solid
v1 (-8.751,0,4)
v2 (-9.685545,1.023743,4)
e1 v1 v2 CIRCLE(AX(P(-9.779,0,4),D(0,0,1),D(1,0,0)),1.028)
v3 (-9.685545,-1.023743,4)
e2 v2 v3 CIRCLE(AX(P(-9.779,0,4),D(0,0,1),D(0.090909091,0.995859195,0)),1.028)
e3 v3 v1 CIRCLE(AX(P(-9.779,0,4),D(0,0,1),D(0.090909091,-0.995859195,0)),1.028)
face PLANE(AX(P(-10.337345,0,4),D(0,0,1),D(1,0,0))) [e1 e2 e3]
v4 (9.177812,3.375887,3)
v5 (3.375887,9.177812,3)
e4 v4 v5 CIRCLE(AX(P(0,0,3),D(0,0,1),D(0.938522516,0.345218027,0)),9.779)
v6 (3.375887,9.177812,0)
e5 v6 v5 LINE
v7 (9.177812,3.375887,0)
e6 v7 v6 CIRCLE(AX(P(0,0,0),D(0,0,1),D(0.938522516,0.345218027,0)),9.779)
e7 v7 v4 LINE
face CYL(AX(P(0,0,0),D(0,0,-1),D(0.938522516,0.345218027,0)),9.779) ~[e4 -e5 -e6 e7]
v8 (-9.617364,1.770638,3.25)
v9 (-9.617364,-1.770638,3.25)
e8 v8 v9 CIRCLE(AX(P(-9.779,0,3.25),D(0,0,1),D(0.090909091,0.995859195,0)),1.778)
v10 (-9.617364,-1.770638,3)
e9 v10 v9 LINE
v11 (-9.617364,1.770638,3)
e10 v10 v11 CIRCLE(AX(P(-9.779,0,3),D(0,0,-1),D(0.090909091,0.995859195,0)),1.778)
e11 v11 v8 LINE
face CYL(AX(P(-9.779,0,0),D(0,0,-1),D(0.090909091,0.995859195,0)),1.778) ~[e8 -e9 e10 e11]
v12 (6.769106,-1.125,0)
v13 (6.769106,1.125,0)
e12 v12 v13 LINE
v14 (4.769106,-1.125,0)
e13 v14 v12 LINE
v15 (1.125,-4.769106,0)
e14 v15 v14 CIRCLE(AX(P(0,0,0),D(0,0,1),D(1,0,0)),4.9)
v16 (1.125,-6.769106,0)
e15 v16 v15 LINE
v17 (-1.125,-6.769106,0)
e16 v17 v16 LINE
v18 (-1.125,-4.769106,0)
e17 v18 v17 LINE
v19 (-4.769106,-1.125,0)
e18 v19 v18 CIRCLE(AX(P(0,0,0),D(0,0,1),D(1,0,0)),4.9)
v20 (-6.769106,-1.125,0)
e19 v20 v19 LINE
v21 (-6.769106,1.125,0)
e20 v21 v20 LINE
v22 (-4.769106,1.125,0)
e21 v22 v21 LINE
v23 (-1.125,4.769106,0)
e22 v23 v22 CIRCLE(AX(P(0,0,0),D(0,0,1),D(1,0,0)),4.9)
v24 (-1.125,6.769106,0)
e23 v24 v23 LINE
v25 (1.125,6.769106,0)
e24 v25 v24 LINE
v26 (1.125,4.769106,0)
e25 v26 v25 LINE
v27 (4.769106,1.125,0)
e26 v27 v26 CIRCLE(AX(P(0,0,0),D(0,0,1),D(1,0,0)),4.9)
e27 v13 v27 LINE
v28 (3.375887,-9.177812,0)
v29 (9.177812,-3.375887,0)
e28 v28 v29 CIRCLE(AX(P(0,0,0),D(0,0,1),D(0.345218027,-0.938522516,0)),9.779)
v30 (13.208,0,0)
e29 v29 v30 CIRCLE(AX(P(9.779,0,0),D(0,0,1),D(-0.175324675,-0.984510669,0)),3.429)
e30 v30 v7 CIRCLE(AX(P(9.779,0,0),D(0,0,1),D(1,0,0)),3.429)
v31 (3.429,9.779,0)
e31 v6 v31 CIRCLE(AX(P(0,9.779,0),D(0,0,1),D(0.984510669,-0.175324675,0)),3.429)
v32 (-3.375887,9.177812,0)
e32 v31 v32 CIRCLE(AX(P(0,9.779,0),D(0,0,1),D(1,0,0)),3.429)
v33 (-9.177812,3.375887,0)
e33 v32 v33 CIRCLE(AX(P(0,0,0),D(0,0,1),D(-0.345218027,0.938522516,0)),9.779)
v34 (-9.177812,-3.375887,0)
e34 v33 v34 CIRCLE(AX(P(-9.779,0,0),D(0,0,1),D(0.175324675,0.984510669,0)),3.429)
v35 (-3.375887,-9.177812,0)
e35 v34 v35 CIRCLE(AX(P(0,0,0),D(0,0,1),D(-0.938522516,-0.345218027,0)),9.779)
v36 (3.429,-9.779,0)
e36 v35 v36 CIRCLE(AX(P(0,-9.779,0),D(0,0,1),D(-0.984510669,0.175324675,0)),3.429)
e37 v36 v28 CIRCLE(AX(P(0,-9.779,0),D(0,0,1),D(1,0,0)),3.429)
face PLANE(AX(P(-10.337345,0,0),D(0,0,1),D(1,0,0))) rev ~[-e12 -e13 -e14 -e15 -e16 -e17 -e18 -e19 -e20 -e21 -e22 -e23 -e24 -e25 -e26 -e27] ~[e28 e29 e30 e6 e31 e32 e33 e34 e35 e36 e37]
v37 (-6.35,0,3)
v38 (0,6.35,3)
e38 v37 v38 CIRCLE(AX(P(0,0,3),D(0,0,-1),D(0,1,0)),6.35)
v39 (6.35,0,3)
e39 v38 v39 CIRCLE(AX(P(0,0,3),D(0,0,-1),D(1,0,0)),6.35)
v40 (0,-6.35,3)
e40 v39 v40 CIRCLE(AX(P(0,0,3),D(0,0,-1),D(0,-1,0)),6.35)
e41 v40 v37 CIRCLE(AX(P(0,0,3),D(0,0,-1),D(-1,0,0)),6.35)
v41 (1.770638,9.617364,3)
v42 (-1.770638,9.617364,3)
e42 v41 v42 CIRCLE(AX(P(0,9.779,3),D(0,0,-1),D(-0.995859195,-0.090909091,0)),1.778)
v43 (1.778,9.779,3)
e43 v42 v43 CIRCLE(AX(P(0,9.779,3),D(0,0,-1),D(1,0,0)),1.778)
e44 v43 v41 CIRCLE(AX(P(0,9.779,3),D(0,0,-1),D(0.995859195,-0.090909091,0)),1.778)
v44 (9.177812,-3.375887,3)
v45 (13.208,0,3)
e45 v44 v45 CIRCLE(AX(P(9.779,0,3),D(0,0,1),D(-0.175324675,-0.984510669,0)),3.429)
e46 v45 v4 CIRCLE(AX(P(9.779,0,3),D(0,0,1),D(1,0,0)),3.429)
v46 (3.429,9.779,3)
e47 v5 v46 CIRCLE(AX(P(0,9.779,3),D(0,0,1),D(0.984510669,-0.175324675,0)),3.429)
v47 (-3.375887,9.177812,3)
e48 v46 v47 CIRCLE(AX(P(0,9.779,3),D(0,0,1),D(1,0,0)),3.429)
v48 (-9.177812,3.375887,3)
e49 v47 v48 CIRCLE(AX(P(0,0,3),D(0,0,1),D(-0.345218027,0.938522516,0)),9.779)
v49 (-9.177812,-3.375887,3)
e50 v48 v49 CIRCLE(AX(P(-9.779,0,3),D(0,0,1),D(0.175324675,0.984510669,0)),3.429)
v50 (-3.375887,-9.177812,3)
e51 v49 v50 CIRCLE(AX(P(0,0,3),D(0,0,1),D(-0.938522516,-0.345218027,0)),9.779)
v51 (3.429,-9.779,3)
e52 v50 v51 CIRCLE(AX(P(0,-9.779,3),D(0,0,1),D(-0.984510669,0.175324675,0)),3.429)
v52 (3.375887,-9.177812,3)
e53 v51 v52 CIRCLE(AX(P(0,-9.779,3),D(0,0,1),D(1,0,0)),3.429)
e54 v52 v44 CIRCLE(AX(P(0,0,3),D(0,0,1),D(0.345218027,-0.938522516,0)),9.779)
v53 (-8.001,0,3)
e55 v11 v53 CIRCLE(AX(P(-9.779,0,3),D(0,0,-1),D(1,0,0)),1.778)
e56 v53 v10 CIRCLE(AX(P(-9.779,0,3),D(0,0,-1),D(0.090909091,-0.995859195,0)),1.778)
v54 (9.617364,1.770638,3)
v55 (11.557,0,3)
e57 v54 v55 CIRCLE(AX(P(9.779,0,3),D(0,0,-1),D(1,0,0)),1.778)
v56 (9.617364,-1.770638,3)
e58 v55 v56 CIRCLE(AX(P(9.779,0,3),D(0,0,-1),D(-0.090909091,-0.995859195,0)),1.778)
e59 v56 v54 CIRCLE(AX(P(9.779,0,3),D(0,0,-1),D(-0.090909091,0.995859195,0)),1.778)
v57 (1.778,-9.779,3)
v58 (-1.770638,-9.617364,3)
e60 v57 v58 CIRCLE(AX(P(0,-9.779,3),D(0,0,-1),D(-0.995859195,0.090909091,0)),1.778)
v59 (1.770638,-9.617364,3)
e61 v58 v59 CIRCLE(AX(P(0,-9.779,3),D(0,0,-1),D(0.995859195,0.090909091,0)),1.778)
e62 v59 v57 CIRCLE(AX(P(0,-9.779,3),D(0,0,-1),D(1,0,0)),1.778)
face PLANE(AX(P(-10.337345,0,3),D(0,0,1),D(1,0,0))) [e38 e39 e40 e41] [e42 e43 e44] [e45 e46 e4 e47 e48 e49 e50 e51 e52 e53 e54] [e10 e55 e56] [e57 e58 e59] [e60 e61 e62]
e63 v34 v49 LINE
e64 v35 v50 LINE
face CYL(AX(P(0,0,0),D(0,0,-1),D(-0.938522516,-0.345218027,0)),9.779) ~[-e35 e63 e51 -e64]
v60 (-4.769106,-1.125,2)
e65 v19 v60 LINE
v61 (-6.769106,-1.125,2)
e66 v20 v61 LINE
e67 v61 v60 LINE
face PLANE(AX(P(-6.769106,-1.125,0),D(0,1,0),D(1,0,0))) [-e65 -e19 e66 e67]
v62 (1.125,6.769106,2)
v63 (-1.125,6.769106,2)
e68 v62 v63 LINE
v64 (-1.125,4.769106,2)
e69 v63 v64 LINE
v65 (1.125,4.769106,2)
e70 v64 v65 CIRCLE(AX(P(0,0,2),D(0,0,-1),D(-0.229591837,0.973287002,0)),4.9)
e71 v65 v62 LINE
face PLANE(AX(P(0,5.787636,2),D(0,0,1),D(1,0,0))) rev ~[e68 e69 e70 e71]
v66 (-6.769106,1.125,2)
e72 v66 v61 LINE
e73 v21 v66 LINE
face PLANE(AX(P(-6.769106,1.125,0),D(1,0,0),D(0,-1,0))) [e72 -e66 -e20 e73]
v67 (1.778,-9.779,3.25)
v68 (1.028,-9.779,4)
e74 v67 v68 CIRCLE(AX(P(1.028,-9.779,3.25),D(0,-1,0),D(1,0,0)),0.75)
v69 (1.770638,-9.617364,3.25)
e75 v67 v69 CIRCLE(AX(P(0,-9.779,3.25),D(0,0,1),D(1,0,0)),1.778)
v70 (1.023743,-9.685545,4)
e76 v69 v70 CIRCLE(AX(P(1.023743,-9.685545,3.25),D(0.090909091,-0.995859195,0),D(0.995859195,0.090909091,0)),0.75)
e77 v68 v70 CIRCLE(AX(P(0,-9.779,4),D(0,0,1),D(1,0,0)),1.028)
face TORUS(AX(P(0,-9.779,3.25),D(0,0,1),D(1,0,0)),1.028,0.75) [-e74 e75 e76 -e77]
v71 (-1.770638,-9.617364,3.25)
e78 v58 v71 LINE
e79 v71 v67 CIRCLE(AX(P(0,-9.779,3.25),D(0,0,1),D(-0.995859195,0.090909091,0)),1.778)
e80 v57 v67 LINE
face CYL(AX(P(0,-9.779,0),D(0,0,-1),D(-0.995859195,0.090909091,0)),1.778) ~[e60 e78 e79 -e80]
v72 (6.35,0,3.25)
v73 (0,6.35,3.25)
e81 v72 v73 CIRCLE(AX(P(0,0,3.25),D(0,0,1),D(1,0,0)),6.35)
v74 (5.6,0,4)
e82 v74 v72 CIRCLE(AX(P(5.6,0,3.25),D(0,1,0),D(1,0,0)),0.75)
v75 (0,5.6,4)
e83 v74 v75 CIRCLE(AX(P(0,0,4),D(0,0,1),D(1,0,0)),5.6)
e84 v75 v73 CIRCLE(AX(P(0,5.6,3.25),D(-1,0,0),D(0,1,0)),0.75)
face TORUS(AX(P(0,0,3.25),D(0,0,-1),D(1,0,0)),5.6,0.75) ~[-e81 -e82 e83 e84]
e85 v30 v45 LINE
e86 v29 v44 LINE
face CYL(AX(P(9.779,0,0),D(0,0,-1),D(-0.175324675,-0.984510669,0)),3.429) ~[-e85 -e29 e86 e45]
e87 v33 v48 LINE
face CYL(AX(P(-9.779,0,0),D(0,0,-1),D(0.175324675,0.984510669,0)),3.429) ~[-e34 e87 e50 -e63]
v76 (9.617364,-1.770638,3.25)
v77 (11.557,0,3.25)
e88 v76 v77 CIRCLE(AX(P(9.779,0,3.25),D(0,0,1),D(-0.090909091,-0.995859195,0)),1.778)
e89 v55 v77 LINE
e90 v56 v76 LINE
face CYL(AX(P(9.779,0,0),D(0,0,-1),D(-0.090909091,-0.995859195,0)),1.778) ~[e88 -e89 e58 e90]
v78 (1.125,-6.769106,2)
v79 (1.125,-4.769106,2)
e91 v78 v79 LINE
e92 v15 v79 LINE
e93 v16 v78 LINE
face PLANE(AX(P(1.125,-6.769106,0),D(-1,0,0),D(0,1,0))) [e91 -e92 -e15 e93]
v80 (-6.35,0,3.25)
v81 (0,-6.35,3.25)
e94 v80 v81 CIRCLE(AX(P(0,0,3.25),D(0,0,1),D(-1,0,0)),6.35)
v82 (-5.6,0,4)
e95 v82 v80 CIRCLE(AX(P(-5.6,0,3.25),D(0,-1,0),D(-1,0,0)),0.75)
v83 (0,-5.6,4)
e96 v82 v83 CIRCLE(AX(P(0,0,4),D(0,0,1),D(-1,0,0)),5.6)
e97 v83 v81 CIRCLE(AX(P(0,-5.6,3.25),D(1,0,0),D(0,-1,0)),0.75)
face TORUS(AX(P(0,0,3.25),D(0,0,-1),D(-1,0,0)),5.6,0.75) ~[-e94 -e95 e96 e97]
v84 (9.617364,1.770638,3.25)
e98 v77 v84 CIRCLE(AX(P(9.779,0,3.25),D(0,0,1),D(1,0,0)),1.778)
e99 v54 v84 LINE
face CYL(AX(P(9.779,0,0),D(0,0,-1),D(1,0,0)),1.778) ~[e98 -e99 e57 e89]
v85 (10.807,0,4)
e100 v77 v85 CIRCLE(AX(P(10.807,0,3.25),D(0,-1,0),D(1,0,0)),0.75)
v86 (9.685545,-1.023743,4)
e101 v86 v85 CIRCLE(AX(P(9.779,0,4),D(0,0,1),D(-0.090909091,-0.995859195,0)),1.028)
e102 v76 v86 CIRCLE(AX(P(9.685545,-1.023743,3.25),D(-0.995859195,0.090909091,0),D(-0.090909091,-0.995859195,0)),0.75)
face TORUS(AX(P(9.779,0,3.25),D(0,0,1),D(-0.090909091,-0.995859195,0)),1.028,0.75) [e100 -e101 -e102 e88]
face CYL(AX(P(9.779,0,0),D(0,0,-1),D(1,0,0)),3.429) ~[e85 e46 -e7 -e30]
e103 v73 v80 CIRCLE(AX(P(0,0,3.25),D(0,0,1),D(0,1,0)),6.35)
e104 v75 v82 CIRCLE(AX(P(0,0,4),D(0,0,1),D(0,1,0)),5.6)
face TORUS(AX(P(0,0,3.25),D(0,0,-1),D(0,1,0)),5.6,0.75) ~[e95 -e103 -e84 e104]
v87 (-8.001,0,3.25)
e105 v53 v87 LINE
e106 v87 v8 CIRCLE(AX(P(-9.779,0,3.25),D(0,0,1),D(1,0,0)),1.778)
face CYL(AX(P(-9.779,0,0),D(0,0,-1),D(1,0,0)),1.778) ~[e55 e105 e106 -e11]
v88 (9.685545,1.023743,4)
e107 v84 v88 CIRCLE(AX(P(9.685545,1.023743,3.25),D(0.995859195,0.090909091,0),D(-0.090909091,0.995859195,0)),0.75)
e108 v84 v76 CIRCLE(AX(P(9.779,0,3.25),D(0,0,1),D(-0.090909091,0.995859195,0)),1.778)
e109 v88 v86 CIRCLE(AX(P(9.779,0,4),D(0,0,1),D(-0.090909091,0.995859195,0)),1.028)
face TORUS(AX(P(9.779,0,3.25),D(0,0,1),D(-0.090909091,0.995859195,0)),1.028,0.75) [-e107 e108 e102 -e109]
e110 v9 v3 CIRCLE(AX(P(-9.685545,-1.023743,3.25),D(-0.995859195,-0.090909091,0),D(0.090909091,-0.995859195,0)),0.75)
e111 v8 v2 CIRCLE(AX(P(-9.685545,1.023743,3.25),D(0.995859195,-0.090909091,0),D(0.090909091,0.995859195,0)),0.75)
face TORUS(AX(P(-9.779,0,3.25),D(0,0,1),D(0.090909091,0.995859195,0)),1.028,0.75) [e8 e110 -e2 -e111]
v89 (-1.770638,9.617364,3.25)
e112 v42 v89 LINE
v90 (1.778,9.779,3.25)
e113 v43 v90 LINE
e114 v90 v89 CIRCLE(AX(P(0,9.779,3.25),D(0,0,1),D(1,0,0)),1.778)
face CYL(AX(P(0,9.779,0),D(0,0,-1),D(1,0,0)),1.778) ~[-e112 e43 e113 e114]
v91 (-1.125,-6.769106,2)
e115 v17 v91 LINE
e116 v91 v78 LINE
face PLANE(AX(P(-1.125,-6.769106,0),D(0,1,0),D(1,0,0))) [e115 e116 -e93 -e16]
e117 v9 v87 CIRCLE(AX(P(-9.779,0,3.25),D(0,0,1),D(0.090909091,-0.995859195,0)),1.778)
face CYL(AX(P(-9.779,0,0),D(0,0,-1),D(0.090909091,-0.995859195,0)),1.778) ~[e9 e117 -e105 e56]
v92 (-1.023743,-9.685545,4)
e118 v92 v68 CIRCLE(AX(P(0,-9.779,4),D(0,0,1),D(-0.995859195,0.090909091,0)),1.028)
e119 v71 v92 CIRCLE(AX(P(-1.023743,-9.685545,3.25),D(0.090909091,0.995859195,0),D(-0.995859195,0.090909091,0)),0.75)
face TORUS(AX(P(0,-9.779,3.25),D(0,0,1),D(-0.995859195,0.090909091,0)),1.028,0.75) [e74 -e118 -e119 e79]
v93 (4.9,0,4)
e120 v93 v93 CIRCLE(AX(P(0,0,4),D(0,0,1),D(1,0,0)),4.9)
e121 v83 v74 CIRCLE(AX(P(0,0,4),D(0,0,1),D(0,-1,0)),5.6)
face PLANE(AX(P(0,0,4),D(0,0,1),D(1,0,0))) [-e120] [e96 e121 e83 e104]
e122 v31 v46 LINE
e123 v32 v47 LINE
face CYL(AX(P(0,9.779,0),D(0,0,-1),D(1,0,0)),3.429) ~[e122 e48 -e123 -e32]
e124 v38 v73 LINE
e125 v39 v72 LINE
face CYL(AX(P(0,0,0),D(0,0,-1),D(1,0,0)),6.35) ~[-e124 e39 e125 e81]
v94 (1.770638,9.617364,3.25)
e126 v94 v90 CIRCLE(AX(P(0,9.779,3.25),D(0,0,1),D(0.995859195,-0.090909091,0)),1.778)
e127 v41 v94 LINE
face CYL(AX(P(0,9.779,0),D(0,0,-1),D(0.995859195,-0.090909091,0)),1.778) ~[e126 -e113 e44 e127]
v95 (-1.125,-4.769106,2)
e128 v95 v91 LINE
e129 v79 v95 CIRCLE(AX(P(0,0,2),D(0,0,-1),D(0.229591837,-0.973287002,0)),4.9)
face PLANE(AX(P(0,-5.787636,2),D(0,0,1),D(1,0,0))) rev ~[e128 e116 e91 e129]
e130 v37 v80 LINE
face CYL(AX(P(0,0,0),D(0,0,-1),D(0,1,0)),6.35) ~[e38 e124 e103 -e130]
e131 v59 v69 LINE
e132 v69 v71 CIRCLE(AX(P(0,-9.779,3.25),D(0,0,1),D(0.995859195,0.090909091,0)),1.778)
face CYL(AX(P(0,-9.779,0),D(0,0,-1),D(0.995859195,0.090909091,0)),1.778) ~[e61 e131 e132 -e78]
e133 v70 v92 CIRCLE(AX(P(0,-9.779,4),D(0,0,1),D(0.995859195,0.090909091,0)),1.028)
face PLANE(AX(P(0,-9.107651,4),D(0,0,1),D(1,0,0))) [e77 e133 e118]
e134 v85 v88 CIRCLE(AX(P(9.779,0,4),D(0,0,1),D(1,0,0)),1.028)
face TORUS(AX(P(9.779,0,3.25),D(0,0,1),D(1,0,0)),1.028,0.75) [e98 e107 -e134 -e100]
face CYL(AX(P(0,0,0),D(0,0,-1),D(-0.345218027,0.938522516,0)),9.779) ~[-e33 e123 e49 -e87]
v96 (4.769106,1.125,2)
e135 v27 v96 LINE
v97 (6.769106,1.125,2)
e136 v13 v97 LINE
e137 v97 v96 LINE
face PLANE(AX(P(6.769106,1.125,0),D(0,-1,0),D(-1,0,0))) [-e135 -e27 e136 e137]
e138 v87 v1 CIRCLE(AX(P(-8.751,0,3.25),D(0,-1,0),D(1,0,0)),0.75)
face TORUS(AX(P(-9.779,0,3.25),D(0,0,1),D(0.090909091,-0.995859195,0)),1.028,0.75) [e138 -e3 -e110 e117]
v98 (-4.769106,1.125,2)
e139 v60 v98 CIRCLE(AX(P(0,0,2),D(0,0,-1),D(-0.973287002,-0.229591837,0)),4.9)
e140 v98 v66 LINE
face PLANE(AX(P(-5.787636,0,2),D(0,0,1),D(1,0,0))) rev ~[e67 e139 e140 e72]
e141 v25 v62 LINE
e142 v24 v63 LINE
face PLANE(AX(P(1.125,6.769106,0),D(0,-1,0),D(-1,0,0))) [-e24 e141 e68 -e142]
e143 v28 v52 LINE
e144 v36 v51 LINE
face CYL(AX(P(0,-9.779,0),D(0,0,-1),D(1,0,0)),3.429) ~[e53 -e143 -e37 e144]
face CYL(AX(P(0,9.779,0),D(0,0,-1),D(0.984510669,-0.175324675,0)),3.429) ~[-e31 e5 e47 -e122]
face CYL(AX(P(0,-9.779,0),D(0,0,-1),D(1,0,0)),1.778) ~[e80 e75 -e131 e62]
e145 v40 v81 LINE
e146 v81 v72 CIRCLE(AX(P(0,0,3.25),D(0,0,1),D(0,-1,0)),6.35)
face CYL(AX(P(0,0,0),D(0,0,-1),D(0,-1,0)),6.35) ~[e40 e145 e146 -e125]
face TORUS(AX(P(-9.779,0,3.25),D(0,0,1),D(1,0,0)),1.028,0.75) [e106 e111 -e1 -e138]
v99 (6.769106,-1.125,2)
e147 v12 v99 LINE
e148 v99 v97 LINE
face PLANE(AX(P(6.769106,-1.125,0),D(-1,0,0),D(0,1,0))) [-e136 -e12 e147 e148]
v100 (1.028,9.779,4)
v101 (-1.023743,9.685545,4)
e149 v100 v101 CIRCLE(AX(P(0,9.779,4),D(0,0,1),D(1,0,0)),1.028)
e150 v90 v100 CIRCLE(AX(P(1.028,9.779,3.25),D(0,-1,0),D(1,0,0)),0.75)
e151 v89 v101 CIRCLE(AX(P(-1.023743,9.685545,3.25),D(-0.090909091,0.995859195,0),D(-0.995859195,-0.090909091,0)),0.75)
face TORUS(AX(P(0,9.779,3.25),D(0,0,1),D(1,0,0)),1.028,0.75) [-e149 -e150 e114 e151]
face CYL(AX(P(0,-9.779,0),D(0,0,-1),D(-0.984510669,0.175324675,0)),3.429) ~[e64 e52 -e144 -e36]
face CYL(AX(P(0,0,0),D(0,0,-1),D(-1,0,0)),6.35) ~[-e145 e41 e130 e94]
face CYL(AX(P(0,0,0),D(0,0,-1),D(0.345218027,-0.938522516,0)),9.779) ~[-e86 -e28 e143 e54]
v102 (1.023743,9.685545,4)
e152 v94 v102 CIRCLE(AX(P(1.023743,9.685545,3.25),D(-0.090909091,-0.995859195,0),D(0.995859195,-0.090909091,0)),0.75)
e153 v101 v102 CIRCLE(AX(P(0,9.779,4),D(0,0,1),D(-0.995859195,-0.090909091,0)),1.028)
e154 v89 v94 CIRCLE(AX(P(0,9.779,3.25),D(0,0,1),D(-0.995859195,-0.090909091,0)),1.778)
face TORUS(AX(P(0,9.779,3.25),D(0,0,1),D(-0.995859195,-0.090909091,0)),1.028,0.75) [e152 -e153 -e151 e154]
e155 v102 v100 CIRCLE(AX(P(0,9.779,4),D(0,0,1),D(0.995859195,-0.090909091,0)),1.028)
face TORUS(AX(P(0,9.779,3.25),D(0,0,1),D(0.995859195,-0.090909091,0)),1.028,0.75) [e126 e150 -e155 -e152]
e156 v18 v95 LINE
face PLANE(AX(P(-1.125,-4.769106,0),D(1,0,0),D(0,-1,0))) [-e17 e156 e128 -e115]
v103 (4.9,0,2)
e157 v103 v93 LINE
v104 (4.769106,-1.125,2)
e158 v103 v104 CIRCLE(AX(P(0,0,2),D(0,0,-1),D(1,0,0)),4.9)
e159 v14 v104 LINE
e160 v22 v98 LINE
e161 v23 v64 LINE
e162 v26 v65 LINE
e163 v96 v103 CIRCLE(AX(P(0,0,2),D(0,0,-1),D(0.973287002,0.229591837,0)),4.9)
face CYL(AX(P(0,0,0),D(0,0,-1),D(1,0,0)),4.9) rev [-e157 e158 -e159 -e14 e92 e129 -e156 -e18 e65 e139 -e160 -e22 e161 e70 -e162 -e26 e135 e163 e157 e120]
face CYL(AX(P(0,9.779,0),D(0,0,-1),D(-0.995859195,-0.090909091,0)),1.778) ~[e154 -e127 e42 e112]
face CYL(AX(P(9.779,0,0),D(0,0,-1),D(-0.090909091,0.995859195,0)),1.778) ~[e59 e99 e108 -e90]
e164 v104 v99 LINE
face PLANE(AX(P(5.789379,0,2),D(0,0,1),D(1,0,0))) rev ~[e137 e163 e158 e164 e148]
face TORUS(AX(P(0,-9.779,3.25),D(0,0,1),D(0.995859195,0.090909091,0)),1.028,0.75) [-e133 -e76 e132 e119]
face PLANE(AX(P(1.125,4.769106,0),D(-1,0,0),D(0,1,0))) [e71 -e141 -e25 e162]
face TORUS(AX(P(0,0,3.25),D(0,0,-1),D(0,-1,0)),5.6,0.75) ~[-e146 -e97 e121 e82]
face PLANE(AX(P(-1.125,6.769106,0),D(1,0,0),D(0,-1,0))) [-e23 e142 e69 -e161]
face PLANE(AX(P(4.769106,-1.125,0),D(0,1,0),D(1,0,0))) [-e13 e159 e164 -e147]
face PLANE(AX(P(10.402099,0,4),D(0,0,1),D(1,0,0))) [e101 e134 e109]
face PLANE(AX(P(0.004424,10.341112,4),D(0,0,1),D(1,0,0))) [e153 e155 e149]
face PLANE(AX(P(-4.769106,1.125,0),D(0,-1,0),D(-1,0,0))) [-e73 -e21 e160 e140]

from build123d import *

# Parameters (mm, degrees)
F0_R     = 4.9
F1_DEPTH = 3
F2_DEPTH = 4
F4_DEPTH = 2
F5_R     = 0.75


with BuildPart() as f1:
    # F0 (on Top) → F1 (new body)
    with BuildSketch(Plane.XY):
        with BuildLine():
            ThreePointArc((-9.6173636364, -1.7706376495), (-9.779, 0), (-9.6173636364, 1.7706376495))
            ThreePointArc((-9.6173636364, 1.7706376495), (-11.557, 0), (-9.6173636364, -1.7706376495))
        make_face()
        with BuildLine():
            ThreePointArc((1.778, 9.779), (-0.080901975, 11.5551584587), (-1.7706376495, 9.6173636364))
            ThreePointArc((-1.7706376495, 9.6173636364), (0, 9.779), (1.7706376495, 9.6173636364))
            ThreePointArc((1.7706376495, 9.6173636364), (1.7761584587, 9.698098025), (1.778, 9.779))
        make_face()
        with BuildLine():
            ThreePointArc((-3.3758870855, -9.1778116883), (-2.201881727, -7.1503581719), (0, -6.35))
            ThreePointArc((0, -6.35), (-4.4901280605, -4.4901280605), (-6.35, 0))
            ThreePointArc((-6.35, 0), (-7.1503581719, -2.201881727), (-9.1778116883, -3.3758870855))
            ThreePointArc((-9.1778116883, -3.3758870855), (-6.9147972132, -6.9147972132), (-3.3758870855, -9.1778116883))
        make_face()
        with BuildLine():
            ThreePointArc((-8.001, 0), (-8.4658599742, 1.1987273555), (-9.6173636364, 1.7706376495))
            ThreePointArc((-9.6173636364, 1.7706376495), (-9.779, 0), (-9.6173636364, -1.7706376495))
            ThreePointArc((-9.6173636364, -1.7706376495), (-8.4658599742, -1.1987273555), (-8.001, 0))
        make_face()
        with BuildLine():
            ThreePointArc((3.3758870855, -9.1778116883), (2.201881727, -7.1503581719), (0, -6.35))
            ThreePointArc((0, -6.35), (-2.201881727, -7.1503581719), (-3.3758870855, -9.1778116883))
            ThreePointArc((-3.3758870855, -9.1778116883), (-2.5826305757, -9.4318004808), (-1.7706376495, -9.6173636364))
            ThreePointArc((-1.7706376495, -9.6173636364), (0, -8.001), (1.7706376495, -9.6173636364))
            ThreePointArc((1.7706376495, -9.6173636364), (2.5826305757, -9.4318004808), (3.3758870855, -9.1778116883))
        make_face()
        with BuildLine():
            ThreePointArc((9.1778116883, 3.3758870855), (7.1503581719, 2.201881727), (6.35, 0))
            ThreePointArc((6.35, 0), (7.1503581719, -2.201881727), (9.1778116883, -3.3758870855))
            ThreePointArc((9.1778116883, -3.3758870855), (9.4318004808, -2.5826305757), (9.6173636364, -1.7706376495))
            ThreePointArc((9.6173636364, -1.7706376495), (8.001, 0), (9.6173636364, 1.7706376495))
            ThreePointArc((9.6173636364, 1.7706376495), (9.4318004808, 2.5826305757), (9.1778116883, 3.3758870855))
        make_face()
        with BuildLine():
            ThreePointArc((-9.1778116883, -3.3758870855), (-7.1503581719, -2.201881727), (-6.35, 0))
            ThreePointArc((-6.35, 0), (-7.1503581719, 2.201881727), (-9.1778116883, 3.3758870855))
            ThreePointArc((-9.1778116883, 3.3758870855), (-9.4318004808, 2.5826305757), (-9.6173636364, 1.7706376495))
            ThreePointArc((-9.6173636364, 1.7706376495), (-8.4658599742, 1.1987273555), (-8.001, 0))
            ThreePointArc((-8.001, 0), (-8.4658599742, -1.1987273555), (-9.6173636364, -1.7706376495))
            ThreePointArc((-9.6173636364, -1.7706376495), (-9.4318004808, -2.5826305757), (-9.1778116883, -3.3758870855))
        make_face()
        with BuildLine():
            ThreePointArc((11.557, 0), (10.9777273555, 1.3131400258), (9.6173636364, 1.7706376495))
            ThreePointArc((9.6173636364, 1.7706376495), (9.7385070724, 0.889), (9.779, 0))
            ThreePointArc((9.779, 0), (9.7385070724, -0.889), (9.6173636364, -1.7706376495))
            ThreePointArc((9.6173636364, -1.7706376495), (10.9777273555, -1.3131400258), (11.557, 0))
        make_face()
        with BuildLine():
            ThreePointArc((1.778, -9.779), (1.7761584587, -9.698098025), (1.7706376495, -9.6173636364))
            ThreePointArc((1.7706376495, -9.6173636364), (0, -9.779), (-1.7706376495, -9.6173636364))
            ThreePointArc((-1.7706376495, -9.6173636364), (-0.080901975, -11.5551584587), (1.778, -9.779))
        make_face()
        with BuildLine():
            ThreePointArc((-9.6173636364, 1.7706376495), (-9.4318004808, 2.5826305757), (-9.1778116883, 3.3758870855))
            ThreePointArc((-9.1778116883, 3.3758870855), (-13.208, 0), (-9.1778116883, -3.3758870855))
            ThreePointArc((-9.1778116883, -3.3758870855), (-9.4318004808, -2.5826305757), (-9.6173636364, -1.7706376495))
            ThreePointArc((-9.6173636364, -1.7706376495), (-11.557, 0), (-9.6173636364, 1.7706376495))
        make_face()
        with BuildLine():
            ThreePointArc((1.7706376495, 9.6173636364), (0, 9.779), (-1.7706376495, 9.6173636364))
            ThreePointArc((-1.7706376495, 9.6173636364), (0, 8.001), (1.7706376495, 9.6173636364))
        make_face()
        with BuildLine():
            ThreePointArc((3.429, 9.779), (-0.3017649614, 13.1946959625), (-3.3758870855, 9.1778116883))
            ThreePointArc((-3.3758870855, 9.1778116883), (-2.5826305757, 9.4318004808), (-1.7706376495, 9.6173636364))
            ThreePointArc((-1.7706376495, 9.6173636364), (-0.080901975, 11.5551584587), (1.778, 9.779))
            ThreePointArc((1.778, 9.779), (1.7761584587, 9.698098025), (1.7706376495, 9.6173636364))
            ThreePointArc((1.7706376495, 9.6173636364), (2.5826305757, 9.4318004808), (3.3758870855, 9.1778116883))
            ThreePointArc((3.3758870855, 9.1778116883), (3.4156959625, 9.4772350386), (3.429, 9.779))
        make_face()
        with BuildLine():
            ThreePointArc((13.208, 0), (11.980881727, 2.6286418281), (9.1778116883, 3.3758870855))
            ThreePointArc((9.1778116883, 3.3758870855), (9.4318004808, 2.5826305757), (9.6173636364, 1.7706376495))
            ThreePointArc((9.6173636364, 1.7706376495), (10.9777273555, 1.3131400258), (11.557, 0))
            ThreePointArc((11.557, 0), (10.9777273555, -1.3131400258), (9.6173636364, -1.7706376495))
            ThreePointArc((9.6173636364, -1.7706376495), (9.4318004808, -2.5826305757), (9.1778116883, -3.3758870855))
            ThreePointArc((9.1778116883, -3.3758870855), (11.980881727, -2.6286418281), (13.208, 0))
        make_face()
        with BuildLine():
            ThreePointArc((0, -6.35), (4.4901280605, -4.4901280605), (6.35, 0))
            ThreePointArc((6.35, 0), (4.4901280605, 4.4901280605), (0, 6.35))
            ThreePointArc((0, 6.35), (-4.4901280605, 4.4901280605), (-6.35, 0))
            ThreePointArc((-6.35, 0), (-4.4901280605, -4.4901280605), (0, -6.35))
        make_face()
        Circle(F0_R, mode=Mode.SUBTRACT)
        with BuildLine():
            ThreePointArc((-6.35, 0), (-4.4901280605, 4.4901280605), (0, 6.35))
            ThreePointArc((0, 6.35), (-2.201881727, 7.1503581719), (-3.3758870855, 9.1778116883))
            ThreePointArc((-3.3758870855, 9.1778116883), (-6.9147972132, 6.9147972132), (-9.1778116883, 3.3758870855))
            ThreePointArc((-9.1778116883, 3.3758870855), (-7.1503581719, 2.201881727), (-6.35, 0))
        make_face()
        with BuildLine():
            ThreePointArc((9.1778116883, -3.3758870855), (7.1503581719, -2.201881727), (6.35, 0))
            ThreePointArc((6.35, 0), (4.4901280605, -4.4901280605), (0, -6.35))
            ThreePointArc((0, -6.35), (2.201881727, -7.1503581719), (3.3758870855, -9.1778116883))
            ThreePointArc((3.3758870855, -9.1778116883), (6.9147972132, -6.9147972132), (9.1778116883, -3.3758870855))
        make_face()
        with BuildLine():
            ThreePointArc((0, 6.35), (4.4901280605, 4.4901280605), (6.35, 0))
            ThreePointArc((6.35, 0), (7.1503581719, 2.201881727), (9.1778116883, 3.3758870855))
            ThreePointArc((9.1778116883, 3.3758870855), (6.9147972132, 6.9147972132), (3.3758870855, 9.1778116883))
            ThreePointArc((3.3758870855, 9.1778116883), (2.201881727, 7.1503581719), (0, 6.35))
        make_face()
        with BuildLine():
            ThreePointArc((9.779, 0), (9.7385070724, 0.889), (9.6173636364, 1.7706376495))
            ThreePointArc((9.6173636364, 1.7706376495), (8.001, 0), (9.6173636364, -1.7706376495))
            ThreePointArc((9.6173636364, -1.7706376495), (9.7385070724, -0.889), (9.779, 0))
        make_face()
        with BuildLine():
            ThreePointArc((-1.7706376495, -9.6173636364), (0, -9.779), (1.7706376495, -9.6173636364))
            ThreePointArc((1.7706376495, -9.6173636364), (0, -8.001), (-1.7706376495, -9.6173636364))
        make_face()
        with BuildLine():
            ThreePointArc((-3.3758870855, 9.1778116883), (-2.201881727, 7.1503581719), (0, 6.35))
            ThreePointArc((0, 6.35), (2.201881727, 7.1503581719), (3.3758870855, 9.1778116883))
            ThreePointArc((3.3758870855, 9.1778116883), (2.5826305757, 9.4318004808), (1.7706376495, 9.6173636364))
            ThreePointArc((1.7706376495, 9.6173636364), (0, 8.001), (-1.7706376495, 9.6173636364))
            ThreePointArc((-1.7706376495, 9.6173636364), (-2.5826305757, 9.4318004808), (-3.3758870855, 9.1778116883))
        make_face()
        with BuildLine():
            ThreePointArc((3.429, -9.779), (3.4156959625, -9.4772350386), (3.3758870855, -9.1778116883))
            ThreePointArc((3.3758870855, -9.1778116883), (2.5826305757, -9.4318004808), (1.7706376495, -9.6173636364))
            ThreePointArc((1.7706376495, -9.6173636364), (1.7761584587, -9.698098025), (1.778, -9.779))
            ThreePointArc((1.778, -9.779), (-0.080901975, -11.5551584587), (-1.7706376495, -9.6173636364))
            ThreePointArc((-1.7706376495, -9.6173636364), (-2.5826305757, -9.4318004808), (-3.3758870855, -9.1778116883))
            ThreePointArc((-3.3758870855, -9.1778116883), (-0.3017649614, -13.1946959625), (3.429, -9.779))
        make_face()
    extrude(amount=F1_DEPTH)

    # F0 (on Top) → F2 (join)
    with BuildSketch(Plane.XY):
        with BuildLine():
            ThreePointArc((0, -6.35), (4.4901280605, -4.4901280605), (6.35, 0))
            ThreePointArc((6.35, 0), (4.4901280605, 4.4901280605), (0, 6.35))
            ThreePointArc((0, 6.35), (-4.4901280605, 4.4901280605), (-6.35, 0))
            ThreePointArc((-6.35, 0), (-4.4901280605, -4.4901280605), (0, -6.35))
        make_face()
        Circle(F0_R, mode=Mode.SUBTRACT)
        with BuildLine():
            ThreePointArc((-9.6173636364, -1.7706376495), (-9.779, 0), (-9.6173636364, 1.7706376495))
            ThreePointArc((-9.6173636364, 1.7706376495), (-11.557, 0), (-9.6173636364, -1.7706376495))
        make_face()
        with BuildLine():
            ThreePointArc((-8.001, 0), (-8.4658599742, 1.1987273555), (-9.6173636364, 1.7706376495))
            ThreePointArc((-9.6173636364, 1.7706376495), (-9.779, 0), (-9.6173636364, -1.7706376495))
            ThreePointArc((-9.6173636364, -1.7706376495), (-8.4658599742, -1.1987273555), (-8.001, 0))
        make_face()
        with BuildLine():
            ThreePointArc((1.778, 9.779), (-0.080901975, 11.5551584587), (-1.7706376495, 9.6173636364))
            ThreePointArc((-1.7706376495, 9.6173636364), (0, 9.779), (1.7706376495, 9.6173636364))
            ThreePointArc((1.7706376495, 9.6173636364), (1.7761584587, 9.698098025), (1.778, 9.779))
        make_face()
        with BuildLine():
            ThreePointArc((1.7706376495, 9.6173636364), (0, 9.779), (-1.7706376495, 9.6173636364))
            ThreePointArc((-1.7706376495, 9.6173636364), (0, 8.001), (1.7706376495, 9.6173636364))
        make_face()
        with BuildLine():
            ThreePointArc((11.557, 0), (10.9777273555, 1.3131400258), (9.6173636364, 1.7706376495))
            ThreePointArc((9.6173636364, 1.7706376495), (9.7385070724, 0.889), (9.779, 0))
            ThreePointArc((9.779, 0), (9.7385070724, -0.889), (9.6173636364, -1.7706376495))
            ThreePointArc((9.6173636364, -1.7706376495), (10.9777273555, -1.3131400258), (11.557, 0))
        make_face()
        with BuildLine():
            ThreePointArc((9.779, 0), (9.7385070724, 0.889), (9.6173636364, 1.7706376495))
            ThreePointArc((9.6173636364, 1.7706376495), (8.001, 0), (9.6173636364, -1.7706376495))
            ThreePointArc((9.6173636364, -1.7706376495), (9.7385070724, -0.889), (9.779, 0))
        make_face()
        with BuildLine():
            ThreePointArc((-1.7706376495, -9.6173636364), (0, -9.779), (1.7706376495, -9.6173636364))
            ThreePointArc((1.7706376495, -9.6173636364), (0, -8.001), (-1.7706376495, -9.6173636364))
        make_face()
        with BuildLine():
            ThreePointArc((1.778, -9.779), (1.7761584587, -9.698098025), (1.7706376495, -9.6173636364))
            ThreePointArc((1.7706376495, -9.6173636364), (0, -9.779), (-1.7706376495, -9.6173636364))
            ThreePointArc((-1.7706376495, -9.6173636364), (-0.080901975, -11.5551584587), (1.778, -9.779))
        make_face()
    extrude(amount=F2_DEPTH)

    # F3 (on face) → F4 (cut)
    with BuildSketch(Plane.XY):
        with BuildLine():
            ThreePointArc((-1.125, 4.7691063104), (0, 4.9), (1.125, 4.7691063104))
            Line((1.125, 4.7691063104), (1.125, 6.7691063104))
            Line((1.125, 6.7691063104), (-1.125, 6.7691063104))
            Line((-1.125, 6.7691063104), (-1.125, 4.7691063104))
        make_face()
        with BuildLine():
            Line((6.7691063104, 1.125), (4.7691063104, 1.125))
            ThreePointArc((4.7691063104, 1.125), (4.8671665741, 0.5662945695), (4.9, 0))
            ThreePointArc((4.9, 0), (4.8671665741, -0.5662945695), (4.7691063104, -1.125))
            Line((4.7691063104, -1.125), (6.7691063104, -1.125))
            Line((6.7691063104, -1.125), (6.7691063104, 1.125))
        make_face()
        with BuildLine():
            Line((1.125, -6.7691063104), (1.125, -4.7691063104))
            ThreePointArc((1.125, -4.7691063104), (0, -4.9), (-1.125, -4.7691063104))
            Line((-1.125, -4.7691063104), (-1.125, -6.7691063104))
            Line((-1.125, -6.7691063104), (1.125, -6.7691063104))
        make_face()
        with BuildLine():
            ThreePointArc((-4.7691063104, -1.125), (-4.9, 0), (-4.7691063104, 1.125))
            Line((-4.7691063104, 1.125), (-6.7691063104, 1.125))
            Line((-6.7691063104, 1.125), (-6.7691063104, -1.125))
            Line((-6.7691063104, -1.125), (-4.7691063104, -1.125))
        make_face()
    extrude(amount=F4_DEPTH, mode=Mode.SUBTRACT)

    # F5
    f5_edges = [f1.edges().sort_by_distance(p)[0] for p in [
        (-9.940636, 1.770638, 4),
        (1.770638, 9.940636, 4),
        (9.940636, -1.770638, 4),
        (1.770638, -9.940636, 4),
        (0, -6.35, 4),
    ]]
    fillet(f5_edges, radius=F5_R)


solid = f1.part
